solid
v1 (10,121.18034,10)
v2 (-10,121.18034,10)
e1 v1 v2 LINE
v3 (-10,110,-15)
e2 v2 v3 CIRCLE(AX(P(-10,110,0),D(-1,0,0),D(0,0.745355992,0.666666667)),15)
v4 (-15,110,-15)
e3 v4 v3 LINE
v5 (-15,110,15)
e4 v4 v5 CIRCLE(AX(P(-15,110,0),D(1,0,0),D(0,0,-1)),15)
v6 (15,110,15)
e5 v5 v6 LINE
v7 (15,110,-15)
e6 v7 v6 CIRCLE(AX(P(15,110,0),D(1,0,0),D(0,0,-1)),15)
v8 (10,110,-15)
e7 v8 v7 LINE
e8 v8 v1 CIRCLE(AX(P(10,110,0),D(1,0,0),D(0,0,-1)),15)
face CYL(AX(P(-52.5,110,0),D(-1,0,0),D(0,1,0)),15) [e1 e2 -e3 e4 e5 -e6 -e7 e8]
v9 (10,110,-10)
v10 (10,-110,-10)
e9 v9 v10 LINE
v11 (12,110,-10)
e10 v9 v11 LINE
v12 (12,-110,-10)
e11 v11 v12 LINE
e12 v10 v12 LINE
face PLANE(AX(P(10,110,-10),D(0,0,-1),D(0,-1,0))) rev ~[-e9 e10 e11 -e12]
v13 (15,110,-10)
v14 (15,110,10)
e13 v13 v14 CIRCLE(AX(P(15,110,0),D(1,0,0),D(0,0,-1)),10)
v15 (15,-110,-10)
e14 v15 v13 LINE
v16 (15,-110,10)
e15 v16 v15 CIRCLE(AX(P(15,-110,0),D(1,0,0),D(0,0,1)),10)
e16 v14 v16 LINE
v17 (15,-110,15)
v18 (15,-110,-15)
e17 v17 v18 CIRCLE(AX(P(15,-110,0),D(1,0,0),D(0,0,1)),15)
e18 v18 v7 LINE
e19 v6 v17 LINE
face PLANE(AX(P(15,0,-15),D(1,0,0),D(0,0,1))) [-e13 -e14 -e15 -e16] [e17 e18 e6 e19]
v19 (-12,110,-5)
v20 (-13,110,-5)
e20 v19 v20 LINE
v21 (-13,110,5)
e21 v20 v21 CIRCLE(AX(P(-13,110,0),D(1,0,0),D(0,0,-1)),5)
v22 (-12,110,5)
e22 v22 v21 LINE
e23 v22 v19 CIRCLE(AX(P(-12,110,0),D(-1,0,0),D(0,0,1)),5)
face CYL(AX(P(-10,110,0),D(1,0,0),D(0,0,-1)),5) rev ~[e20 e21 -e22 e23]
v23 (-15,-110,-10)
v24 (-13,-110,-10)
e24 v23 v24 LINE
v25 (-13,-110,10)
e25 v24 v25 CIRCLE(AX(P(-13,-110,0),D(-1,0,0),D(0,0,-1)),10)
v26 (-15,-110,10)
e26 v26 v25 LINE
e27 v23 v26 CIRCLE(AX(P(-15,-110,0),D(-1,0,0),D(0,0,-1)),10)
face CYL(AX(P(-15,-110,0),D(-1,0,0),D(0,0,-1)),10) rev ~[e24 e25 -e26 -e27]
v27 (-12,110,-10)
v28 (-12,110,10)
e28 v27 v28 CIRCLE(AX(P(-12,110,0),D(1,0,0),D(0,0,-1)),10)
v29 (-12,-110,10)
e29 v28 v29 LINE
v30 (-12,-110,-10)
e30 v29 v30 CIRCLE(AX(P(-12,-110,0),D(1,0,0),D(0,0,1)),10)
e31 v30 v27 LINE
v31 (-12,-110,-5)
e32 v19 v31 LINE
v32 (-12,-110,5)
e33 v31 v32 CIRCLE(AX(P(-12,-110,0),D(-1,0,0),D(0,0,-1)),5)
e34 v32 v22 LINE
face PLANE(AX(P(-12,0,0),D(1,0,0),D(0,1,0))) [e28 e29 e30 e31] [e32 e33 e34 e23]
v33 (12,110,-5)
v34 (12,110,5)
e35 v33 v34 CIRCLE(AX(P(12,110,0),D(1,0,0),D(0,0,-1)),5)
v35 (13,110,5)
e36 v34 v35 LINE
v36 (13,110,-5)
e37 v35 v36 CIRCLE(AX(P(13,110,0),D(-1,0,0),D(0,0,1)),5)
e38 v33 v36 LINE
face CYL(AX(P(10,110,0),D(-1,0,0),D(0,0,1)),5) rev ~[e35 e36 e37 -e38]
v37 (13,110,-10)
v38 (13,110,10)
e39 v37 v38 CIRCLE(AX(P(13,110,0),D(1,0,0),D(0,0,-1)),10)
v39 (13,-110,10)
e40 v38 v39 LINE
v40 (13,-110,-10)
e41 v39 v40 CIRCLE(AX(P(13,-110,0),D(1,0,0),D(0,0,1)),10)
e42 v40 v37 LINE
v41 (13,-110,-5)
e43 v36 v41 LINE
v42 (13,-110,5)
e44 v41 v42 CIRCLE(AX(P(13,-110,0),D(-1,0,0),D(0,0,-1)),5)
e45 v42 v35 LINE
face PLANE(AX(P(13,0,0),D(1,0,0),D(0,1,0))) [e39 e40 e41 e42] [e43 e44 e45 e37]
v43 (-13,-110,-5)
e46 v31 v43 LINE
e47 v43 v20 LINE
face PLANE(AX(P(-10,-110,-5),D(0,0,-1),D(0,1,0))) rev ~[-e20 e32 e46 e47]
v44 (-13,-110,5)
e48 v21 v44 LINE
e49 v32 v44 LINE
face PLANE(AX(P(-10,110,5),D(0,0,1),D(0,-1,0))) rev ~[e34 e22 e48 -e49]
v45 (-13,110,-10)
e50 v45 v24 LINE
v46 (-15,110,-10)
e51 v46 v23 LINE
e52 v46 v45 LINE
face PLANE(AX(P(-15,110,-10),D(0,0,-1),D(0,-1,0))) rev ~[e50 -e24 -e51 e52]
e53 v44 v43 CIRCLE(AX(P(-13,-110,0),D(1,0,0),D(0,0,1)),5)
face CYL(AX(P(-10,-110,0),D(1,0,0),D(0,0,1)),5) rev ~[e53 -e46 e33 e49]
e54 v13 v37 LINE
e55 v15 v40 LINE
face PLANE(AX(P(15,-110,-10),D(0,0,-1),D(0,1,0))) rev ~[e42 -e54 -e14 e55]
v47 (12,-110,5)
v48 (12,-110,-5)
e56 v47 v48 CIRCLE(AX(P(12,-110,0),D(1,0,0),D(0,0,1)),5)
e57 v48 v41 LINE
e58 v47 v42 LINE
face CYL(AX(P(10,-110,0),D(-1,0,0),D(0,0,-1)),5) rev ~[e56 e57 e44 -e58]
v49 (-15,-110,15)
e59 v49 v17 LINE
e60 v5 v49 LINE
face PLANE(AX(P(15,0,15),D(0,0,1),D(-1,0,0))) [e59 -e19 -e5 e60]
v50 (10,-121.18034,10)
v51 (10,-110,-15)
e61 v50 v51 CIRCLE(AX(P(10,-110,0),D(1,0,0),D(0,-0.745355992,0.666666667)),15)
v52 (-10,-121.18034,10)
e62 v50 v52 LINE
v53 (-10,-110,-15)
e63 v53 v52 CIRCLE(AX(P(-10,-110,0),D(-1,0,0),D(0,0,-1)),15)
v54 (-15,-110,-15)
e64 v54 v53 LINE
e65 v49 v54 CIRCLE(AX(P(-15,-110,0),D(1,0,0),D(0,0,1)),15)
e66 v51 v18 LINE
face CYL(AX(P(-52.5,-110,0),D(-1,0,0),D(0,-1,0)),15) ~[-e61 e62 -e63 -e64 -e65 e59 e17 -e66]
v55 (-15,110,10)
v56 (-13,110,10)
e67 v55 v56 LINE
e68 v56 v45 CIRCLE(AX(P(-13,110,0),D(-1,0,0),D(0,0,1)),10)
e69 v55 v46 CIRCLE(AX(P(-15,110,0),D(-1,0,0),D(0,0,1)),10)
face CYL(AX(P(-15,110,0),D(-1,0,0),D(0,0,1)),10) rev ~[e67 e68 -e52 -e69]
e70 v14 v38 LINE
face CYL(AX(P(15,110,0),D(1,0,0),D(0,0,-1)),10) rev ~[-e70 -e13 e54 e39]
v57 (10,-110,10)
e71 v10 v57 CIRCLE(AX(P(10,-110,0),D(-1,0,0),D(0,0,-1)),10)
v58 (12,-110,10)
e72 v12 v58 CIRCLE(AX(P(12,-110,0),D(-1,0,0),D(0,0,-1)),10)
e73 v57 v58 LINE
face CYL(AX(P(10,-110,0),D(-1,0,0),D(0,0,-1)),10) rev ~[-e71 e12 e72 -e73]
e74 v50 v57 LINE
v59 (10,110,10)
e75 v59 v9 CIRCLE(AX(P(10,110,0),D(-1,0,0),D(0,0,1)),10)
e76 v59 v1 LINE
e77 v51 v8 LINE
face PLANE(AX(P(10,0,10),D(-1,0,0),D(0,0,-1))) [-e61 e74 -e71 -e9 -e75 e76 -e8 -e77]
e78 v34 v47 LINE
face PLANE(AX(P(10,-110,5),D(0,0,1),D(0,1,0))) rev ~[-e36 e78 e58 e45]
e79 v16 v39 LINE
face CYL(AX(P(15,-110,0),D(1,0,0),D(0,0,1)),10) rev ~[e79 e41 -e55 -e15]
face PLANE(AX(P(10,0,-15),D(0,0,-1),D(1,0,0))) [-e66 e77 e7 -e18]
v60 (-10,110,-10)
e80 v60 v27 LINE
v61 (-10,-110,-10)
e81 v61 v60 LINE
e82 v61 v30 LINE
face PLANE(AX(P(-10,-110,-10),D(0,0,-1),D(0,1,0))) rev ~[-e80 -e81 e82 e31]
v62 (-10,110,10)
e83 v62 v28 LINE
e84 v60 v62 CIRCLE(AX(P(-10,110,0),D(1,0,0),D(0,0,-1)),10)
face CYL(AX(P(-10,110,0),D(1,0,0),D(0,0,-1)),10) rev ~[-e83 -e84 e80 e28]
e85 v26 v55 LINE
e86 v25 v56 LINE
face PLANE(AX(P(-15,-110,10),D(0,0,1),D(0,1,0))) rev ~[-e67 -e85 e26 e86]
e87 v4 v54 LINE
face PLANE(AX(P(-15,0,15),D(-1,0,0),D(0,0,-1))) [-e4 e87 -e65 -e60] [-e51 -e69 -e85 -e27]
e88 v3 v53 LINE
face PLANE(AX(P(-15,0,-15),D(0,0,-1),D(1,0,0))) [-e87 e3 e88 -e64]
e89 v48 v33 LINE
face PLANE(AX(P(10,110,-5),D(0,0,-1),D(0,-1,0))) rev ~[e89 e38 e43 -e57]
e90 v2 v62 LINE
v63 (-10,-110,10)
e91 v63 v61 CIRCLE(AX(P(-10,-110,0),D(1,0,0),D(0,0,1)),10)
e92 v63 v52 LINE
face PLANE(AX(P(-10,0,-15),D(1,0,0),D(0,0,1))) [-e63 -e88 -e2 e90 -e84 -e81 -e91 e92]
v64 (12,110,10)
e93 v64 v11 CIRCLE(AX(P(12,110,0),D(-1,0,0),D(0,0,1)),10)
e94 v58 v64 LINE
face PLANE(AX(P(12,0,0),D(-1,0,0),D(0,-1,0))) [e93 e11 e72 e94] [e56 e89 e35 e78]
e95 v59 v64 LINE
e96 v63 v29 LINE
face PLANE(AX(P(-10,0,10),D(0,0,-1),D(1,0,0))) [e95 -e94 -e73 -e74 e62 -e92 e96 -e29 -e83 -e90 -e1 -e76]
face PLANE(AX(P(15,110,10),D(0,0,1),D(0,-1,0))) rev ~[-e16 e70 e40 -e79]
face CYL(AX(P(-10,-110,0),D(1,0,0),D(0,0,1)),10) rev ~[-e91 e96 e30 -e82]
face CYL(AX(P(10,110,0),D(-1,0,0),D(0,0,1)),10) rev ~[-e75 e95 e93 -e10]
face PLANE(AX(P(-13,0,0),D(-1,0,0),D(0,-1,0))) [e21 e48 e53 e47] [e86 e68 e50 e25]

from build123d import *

# Parameters (mm, degrees)
F1_DEPTH      = 125
F1_DEPTH_BACK = 125
F6_DEPTH      = 5.001
F7_DEPTH      = 5.001
F8_DEPTH      = 2
F9_DEPTH      = 2
F10_DEPTH     = 2
F11_DEPTH     = 2
F12_T1_DEPTH  = 80
F12_T3_DEPTH  = 80
F12_T5_DEPTH  = 105


# Not quite as in the source:
# - a fillet or chamfer that OpenCascade refuses, or shapes differently, is made with other operations: its cross-section is extruded or revolved along the edge and cut away or added


with BuildPart() as f1:
    # F0 (on Front) → F1 (new body, two sides)
    with BuildSketch(Plane.XZ) as f1_sk:
        Polygon((15, -15), (15, 15), (-15, 15), (-15, -15), (-10, -15), (-10, 10), (10, 10), (10, -15), align=None)
    extrude(amount=F1_DEPTH)
    extrude(f1_sk.sketch, amount=-F1_DEPTH_BACK)

    # F2 (on face) → F6 (cut, through all)
    with BuildSketch(Plane(origin=(10, 0, 0), x_dir=(0, -1, 0), z_dir=(-1, 0, 0))):
        with BuildLine():
            Line((-110, -5), (110, -5))
            ThreePointArc((110, -5), (115, 0), (110, 5))
            Line((110, 5), (-110, 5))
            ThreePointArc((-110, 5), (-115, 0), (-110, -5))
        make_face()
    extrude(amount=-F6_DEPTH, mode=Mode.SUBTRACT)

    # F4 (on face) → F7 (cut, through all)
    with BuildSketch(Plane.YZ.offset(-10)):
        with BuildLine():
            Line((110, 5), (-110, 5))
            ThreePointArc((-110, 5), (-115, 0), (-110, -5))
            Line((-110, -5), (110, -5))
            ThreePointArc((110, -5), (115, 0), (110, 5))
        make_face()
    extrude(amount=-F7_DEPTH, mode=Mode.SUBTRACT)

    # F2 (on face) → F8 (cut)
    with BuildSketch(Plane(origin=(10, 0, 0), x_dir=(0, -1, 0), z_dir=(-1, 0, 0))):
        with BuildLine():
            Line((-110, -10), (110, -10))
            ThreePointArc((110, -10), (120, 0), (110, 10))
            Line((110, 10), (-110, 10))
            ThreePointArc((-110, 10), (-120, 0), (-110, -10))
        make_face()
        with BuildLine():
            ThreePointArc((110, 5), (115, 0), (110, -5))
            Line((110, -5), (-110, -5))
            ThreePointArc((-110, -5), (-115, 0), (-110, 5))
            Line((-110, 5), (110, 5))
        make_face(mode=Mode.SUBTRACT)
    extrude(amount=-F8_DEPTH, mode=Mode.SUBTRACT)

    # F3 (on face) → F9 (cut)
    with BuildSketch(Plane.YZ.offset(15)):
        with BuildLine():
            ThreePointArc((-110, 10), (-120, 0), (-110, -10))
            Line((-110, -10), (110, -10))
            ThreePointArc((110, -10), (120, 0), (110, 10))
            Line((110, 10), (-110, 10))
        make_face()
        with BuildLine():
            ThreePointArc((-110, -5), (-115, 0), (-110, 5))
            Line((-110, 5), (110, 5))
            ThreePointArc((110, 5), (115, 0), (110, -5))
            Line((110, -5), (-110, -5))
        make_face(mode=Mode.SUBTRACT)
    extrude(amount=-F9_DEPTH, mode=Mode.SUBTRACT)

    # F5 (on face) → F10 (cut)
    with BuildSketch(Plane(origin=(-15, 0, 0), x_dir=(0, -1, 0), z_dir=(-1, 0, 0))):
        with BuildLine():
            Line((110, 10), (-110, 10))
            ThreePointArc((-110, 10), (-120, 0), (-110, -10))
            Line((-110, -10), (110, -10))
            ThreePointArc((110, -10), (120, 0), (110, 10))
        make_face()
        with BuildLine():
            ThreePointArc((-110, -5), (-115, 0), (-110, 5))
            Line((-110, 5), (110, 5))
            ThreePointArc((110, 5), (115, 0), (110, -5))
            Line((110, -5), (-110, -5))
        make_face(mode=Mode.SUBTRACT)
    extrude(amount=-F10_DEPTH, mode=Mode.SUBTRACT)

    # F4 (on face) → F11 (cut)
    with BuildSketch(Plane.YZ.offset(-10)):
        with BuildLine():
            Line((110, 10), (-110, 10))
            ThreePointArc((-110, 10), (-120, 0), (-110, -10))
            Line((-110, -10), (110, -10))
            ThreePointArc((110, -10), (120, 0), (110, 10))
        make_face()
        with BuildLine():
            ThreePointArc((-110, -5), (-115, 0), (-110, 5))
            Line((-110, 5), (110, 5))
            ThreePointArc((110, 5), (115, 0), (110, -5))
            Line((110, -5), (-110, -5))
        make_face(mode=Mode.SUBTRACT)
    extrude(amount=-F11_DEPTH, mode=Mode.SUBTRACT)

    # F12: fillet of radius 15 on 6 edges, made by hand

    # F12_s2 → F12_t1 (cut)
    with BuildSketch(Plane.YZ.offset(-52.5)):
        with BuildLine():
            ThreePointArc((125, 0), (120.6066017178, -10.6066017178), (110, -15))
            Line((110, -15), (125, -15))
            Line((125, -15), (125, 0))
        make_face()
        with BuildLine():
            ThreePointArc((-125, 0), (-120.6066017178, -10.6066017178), (-110, -15))
            Line((-110, -15), (-125, -15))
            Line((-125, -15), (-125, 0))
        make_face()
    extrude(amount=F12_T1_DEPTH, mode=Mode.SUBTRACT)

    # F12_s4 → F12_t3 (cut)
    with BuildSketch(Plane.YZ.offset(-27.5)):
        with BuildLine():
            ThreePointArc((110, -15), (120.6066017178, -10.6066017178), (125, 0))
            Line((125, 0), (125, -15))
            Line((125, -15), (110, -15))
        make_face()
        with BuildLine():
            ThreePointArc((-110, -15), (-120.6066017178, -10.6066017178), (-125, 0))
            Line((-125, 0), (-125, -15))
            Line((-125, -15), (-110, -15))
        make_face()
    extrude(amount=F12_T3_DEPTH, mode=Mode.SUBTRACT)

    # F12_s6 → F12_t5 (cut)
    with BuildSketch(Plane.YZ.offset(-52.5)):
        with BuildLine():
            ThreePointArc((125, 0), (120.6066017178, 10.6066017178), (110, 15))
            Line((110, 15), (125, 15))
            Line((125, 15), (125, 0))
        make_face()
        with BuildLine():
            ThreePointArc((-125, 0), (-120.6066017178, 10.6066017178), (-110, 15))
            Line((-110, 15), (-125, 15))
            Line((-125, 15), (-125, 0))
        make_face()
    extrude(amount=F12_T5_DEPTH, mode=Mode.SUBTRACT)


solid = f1.part
